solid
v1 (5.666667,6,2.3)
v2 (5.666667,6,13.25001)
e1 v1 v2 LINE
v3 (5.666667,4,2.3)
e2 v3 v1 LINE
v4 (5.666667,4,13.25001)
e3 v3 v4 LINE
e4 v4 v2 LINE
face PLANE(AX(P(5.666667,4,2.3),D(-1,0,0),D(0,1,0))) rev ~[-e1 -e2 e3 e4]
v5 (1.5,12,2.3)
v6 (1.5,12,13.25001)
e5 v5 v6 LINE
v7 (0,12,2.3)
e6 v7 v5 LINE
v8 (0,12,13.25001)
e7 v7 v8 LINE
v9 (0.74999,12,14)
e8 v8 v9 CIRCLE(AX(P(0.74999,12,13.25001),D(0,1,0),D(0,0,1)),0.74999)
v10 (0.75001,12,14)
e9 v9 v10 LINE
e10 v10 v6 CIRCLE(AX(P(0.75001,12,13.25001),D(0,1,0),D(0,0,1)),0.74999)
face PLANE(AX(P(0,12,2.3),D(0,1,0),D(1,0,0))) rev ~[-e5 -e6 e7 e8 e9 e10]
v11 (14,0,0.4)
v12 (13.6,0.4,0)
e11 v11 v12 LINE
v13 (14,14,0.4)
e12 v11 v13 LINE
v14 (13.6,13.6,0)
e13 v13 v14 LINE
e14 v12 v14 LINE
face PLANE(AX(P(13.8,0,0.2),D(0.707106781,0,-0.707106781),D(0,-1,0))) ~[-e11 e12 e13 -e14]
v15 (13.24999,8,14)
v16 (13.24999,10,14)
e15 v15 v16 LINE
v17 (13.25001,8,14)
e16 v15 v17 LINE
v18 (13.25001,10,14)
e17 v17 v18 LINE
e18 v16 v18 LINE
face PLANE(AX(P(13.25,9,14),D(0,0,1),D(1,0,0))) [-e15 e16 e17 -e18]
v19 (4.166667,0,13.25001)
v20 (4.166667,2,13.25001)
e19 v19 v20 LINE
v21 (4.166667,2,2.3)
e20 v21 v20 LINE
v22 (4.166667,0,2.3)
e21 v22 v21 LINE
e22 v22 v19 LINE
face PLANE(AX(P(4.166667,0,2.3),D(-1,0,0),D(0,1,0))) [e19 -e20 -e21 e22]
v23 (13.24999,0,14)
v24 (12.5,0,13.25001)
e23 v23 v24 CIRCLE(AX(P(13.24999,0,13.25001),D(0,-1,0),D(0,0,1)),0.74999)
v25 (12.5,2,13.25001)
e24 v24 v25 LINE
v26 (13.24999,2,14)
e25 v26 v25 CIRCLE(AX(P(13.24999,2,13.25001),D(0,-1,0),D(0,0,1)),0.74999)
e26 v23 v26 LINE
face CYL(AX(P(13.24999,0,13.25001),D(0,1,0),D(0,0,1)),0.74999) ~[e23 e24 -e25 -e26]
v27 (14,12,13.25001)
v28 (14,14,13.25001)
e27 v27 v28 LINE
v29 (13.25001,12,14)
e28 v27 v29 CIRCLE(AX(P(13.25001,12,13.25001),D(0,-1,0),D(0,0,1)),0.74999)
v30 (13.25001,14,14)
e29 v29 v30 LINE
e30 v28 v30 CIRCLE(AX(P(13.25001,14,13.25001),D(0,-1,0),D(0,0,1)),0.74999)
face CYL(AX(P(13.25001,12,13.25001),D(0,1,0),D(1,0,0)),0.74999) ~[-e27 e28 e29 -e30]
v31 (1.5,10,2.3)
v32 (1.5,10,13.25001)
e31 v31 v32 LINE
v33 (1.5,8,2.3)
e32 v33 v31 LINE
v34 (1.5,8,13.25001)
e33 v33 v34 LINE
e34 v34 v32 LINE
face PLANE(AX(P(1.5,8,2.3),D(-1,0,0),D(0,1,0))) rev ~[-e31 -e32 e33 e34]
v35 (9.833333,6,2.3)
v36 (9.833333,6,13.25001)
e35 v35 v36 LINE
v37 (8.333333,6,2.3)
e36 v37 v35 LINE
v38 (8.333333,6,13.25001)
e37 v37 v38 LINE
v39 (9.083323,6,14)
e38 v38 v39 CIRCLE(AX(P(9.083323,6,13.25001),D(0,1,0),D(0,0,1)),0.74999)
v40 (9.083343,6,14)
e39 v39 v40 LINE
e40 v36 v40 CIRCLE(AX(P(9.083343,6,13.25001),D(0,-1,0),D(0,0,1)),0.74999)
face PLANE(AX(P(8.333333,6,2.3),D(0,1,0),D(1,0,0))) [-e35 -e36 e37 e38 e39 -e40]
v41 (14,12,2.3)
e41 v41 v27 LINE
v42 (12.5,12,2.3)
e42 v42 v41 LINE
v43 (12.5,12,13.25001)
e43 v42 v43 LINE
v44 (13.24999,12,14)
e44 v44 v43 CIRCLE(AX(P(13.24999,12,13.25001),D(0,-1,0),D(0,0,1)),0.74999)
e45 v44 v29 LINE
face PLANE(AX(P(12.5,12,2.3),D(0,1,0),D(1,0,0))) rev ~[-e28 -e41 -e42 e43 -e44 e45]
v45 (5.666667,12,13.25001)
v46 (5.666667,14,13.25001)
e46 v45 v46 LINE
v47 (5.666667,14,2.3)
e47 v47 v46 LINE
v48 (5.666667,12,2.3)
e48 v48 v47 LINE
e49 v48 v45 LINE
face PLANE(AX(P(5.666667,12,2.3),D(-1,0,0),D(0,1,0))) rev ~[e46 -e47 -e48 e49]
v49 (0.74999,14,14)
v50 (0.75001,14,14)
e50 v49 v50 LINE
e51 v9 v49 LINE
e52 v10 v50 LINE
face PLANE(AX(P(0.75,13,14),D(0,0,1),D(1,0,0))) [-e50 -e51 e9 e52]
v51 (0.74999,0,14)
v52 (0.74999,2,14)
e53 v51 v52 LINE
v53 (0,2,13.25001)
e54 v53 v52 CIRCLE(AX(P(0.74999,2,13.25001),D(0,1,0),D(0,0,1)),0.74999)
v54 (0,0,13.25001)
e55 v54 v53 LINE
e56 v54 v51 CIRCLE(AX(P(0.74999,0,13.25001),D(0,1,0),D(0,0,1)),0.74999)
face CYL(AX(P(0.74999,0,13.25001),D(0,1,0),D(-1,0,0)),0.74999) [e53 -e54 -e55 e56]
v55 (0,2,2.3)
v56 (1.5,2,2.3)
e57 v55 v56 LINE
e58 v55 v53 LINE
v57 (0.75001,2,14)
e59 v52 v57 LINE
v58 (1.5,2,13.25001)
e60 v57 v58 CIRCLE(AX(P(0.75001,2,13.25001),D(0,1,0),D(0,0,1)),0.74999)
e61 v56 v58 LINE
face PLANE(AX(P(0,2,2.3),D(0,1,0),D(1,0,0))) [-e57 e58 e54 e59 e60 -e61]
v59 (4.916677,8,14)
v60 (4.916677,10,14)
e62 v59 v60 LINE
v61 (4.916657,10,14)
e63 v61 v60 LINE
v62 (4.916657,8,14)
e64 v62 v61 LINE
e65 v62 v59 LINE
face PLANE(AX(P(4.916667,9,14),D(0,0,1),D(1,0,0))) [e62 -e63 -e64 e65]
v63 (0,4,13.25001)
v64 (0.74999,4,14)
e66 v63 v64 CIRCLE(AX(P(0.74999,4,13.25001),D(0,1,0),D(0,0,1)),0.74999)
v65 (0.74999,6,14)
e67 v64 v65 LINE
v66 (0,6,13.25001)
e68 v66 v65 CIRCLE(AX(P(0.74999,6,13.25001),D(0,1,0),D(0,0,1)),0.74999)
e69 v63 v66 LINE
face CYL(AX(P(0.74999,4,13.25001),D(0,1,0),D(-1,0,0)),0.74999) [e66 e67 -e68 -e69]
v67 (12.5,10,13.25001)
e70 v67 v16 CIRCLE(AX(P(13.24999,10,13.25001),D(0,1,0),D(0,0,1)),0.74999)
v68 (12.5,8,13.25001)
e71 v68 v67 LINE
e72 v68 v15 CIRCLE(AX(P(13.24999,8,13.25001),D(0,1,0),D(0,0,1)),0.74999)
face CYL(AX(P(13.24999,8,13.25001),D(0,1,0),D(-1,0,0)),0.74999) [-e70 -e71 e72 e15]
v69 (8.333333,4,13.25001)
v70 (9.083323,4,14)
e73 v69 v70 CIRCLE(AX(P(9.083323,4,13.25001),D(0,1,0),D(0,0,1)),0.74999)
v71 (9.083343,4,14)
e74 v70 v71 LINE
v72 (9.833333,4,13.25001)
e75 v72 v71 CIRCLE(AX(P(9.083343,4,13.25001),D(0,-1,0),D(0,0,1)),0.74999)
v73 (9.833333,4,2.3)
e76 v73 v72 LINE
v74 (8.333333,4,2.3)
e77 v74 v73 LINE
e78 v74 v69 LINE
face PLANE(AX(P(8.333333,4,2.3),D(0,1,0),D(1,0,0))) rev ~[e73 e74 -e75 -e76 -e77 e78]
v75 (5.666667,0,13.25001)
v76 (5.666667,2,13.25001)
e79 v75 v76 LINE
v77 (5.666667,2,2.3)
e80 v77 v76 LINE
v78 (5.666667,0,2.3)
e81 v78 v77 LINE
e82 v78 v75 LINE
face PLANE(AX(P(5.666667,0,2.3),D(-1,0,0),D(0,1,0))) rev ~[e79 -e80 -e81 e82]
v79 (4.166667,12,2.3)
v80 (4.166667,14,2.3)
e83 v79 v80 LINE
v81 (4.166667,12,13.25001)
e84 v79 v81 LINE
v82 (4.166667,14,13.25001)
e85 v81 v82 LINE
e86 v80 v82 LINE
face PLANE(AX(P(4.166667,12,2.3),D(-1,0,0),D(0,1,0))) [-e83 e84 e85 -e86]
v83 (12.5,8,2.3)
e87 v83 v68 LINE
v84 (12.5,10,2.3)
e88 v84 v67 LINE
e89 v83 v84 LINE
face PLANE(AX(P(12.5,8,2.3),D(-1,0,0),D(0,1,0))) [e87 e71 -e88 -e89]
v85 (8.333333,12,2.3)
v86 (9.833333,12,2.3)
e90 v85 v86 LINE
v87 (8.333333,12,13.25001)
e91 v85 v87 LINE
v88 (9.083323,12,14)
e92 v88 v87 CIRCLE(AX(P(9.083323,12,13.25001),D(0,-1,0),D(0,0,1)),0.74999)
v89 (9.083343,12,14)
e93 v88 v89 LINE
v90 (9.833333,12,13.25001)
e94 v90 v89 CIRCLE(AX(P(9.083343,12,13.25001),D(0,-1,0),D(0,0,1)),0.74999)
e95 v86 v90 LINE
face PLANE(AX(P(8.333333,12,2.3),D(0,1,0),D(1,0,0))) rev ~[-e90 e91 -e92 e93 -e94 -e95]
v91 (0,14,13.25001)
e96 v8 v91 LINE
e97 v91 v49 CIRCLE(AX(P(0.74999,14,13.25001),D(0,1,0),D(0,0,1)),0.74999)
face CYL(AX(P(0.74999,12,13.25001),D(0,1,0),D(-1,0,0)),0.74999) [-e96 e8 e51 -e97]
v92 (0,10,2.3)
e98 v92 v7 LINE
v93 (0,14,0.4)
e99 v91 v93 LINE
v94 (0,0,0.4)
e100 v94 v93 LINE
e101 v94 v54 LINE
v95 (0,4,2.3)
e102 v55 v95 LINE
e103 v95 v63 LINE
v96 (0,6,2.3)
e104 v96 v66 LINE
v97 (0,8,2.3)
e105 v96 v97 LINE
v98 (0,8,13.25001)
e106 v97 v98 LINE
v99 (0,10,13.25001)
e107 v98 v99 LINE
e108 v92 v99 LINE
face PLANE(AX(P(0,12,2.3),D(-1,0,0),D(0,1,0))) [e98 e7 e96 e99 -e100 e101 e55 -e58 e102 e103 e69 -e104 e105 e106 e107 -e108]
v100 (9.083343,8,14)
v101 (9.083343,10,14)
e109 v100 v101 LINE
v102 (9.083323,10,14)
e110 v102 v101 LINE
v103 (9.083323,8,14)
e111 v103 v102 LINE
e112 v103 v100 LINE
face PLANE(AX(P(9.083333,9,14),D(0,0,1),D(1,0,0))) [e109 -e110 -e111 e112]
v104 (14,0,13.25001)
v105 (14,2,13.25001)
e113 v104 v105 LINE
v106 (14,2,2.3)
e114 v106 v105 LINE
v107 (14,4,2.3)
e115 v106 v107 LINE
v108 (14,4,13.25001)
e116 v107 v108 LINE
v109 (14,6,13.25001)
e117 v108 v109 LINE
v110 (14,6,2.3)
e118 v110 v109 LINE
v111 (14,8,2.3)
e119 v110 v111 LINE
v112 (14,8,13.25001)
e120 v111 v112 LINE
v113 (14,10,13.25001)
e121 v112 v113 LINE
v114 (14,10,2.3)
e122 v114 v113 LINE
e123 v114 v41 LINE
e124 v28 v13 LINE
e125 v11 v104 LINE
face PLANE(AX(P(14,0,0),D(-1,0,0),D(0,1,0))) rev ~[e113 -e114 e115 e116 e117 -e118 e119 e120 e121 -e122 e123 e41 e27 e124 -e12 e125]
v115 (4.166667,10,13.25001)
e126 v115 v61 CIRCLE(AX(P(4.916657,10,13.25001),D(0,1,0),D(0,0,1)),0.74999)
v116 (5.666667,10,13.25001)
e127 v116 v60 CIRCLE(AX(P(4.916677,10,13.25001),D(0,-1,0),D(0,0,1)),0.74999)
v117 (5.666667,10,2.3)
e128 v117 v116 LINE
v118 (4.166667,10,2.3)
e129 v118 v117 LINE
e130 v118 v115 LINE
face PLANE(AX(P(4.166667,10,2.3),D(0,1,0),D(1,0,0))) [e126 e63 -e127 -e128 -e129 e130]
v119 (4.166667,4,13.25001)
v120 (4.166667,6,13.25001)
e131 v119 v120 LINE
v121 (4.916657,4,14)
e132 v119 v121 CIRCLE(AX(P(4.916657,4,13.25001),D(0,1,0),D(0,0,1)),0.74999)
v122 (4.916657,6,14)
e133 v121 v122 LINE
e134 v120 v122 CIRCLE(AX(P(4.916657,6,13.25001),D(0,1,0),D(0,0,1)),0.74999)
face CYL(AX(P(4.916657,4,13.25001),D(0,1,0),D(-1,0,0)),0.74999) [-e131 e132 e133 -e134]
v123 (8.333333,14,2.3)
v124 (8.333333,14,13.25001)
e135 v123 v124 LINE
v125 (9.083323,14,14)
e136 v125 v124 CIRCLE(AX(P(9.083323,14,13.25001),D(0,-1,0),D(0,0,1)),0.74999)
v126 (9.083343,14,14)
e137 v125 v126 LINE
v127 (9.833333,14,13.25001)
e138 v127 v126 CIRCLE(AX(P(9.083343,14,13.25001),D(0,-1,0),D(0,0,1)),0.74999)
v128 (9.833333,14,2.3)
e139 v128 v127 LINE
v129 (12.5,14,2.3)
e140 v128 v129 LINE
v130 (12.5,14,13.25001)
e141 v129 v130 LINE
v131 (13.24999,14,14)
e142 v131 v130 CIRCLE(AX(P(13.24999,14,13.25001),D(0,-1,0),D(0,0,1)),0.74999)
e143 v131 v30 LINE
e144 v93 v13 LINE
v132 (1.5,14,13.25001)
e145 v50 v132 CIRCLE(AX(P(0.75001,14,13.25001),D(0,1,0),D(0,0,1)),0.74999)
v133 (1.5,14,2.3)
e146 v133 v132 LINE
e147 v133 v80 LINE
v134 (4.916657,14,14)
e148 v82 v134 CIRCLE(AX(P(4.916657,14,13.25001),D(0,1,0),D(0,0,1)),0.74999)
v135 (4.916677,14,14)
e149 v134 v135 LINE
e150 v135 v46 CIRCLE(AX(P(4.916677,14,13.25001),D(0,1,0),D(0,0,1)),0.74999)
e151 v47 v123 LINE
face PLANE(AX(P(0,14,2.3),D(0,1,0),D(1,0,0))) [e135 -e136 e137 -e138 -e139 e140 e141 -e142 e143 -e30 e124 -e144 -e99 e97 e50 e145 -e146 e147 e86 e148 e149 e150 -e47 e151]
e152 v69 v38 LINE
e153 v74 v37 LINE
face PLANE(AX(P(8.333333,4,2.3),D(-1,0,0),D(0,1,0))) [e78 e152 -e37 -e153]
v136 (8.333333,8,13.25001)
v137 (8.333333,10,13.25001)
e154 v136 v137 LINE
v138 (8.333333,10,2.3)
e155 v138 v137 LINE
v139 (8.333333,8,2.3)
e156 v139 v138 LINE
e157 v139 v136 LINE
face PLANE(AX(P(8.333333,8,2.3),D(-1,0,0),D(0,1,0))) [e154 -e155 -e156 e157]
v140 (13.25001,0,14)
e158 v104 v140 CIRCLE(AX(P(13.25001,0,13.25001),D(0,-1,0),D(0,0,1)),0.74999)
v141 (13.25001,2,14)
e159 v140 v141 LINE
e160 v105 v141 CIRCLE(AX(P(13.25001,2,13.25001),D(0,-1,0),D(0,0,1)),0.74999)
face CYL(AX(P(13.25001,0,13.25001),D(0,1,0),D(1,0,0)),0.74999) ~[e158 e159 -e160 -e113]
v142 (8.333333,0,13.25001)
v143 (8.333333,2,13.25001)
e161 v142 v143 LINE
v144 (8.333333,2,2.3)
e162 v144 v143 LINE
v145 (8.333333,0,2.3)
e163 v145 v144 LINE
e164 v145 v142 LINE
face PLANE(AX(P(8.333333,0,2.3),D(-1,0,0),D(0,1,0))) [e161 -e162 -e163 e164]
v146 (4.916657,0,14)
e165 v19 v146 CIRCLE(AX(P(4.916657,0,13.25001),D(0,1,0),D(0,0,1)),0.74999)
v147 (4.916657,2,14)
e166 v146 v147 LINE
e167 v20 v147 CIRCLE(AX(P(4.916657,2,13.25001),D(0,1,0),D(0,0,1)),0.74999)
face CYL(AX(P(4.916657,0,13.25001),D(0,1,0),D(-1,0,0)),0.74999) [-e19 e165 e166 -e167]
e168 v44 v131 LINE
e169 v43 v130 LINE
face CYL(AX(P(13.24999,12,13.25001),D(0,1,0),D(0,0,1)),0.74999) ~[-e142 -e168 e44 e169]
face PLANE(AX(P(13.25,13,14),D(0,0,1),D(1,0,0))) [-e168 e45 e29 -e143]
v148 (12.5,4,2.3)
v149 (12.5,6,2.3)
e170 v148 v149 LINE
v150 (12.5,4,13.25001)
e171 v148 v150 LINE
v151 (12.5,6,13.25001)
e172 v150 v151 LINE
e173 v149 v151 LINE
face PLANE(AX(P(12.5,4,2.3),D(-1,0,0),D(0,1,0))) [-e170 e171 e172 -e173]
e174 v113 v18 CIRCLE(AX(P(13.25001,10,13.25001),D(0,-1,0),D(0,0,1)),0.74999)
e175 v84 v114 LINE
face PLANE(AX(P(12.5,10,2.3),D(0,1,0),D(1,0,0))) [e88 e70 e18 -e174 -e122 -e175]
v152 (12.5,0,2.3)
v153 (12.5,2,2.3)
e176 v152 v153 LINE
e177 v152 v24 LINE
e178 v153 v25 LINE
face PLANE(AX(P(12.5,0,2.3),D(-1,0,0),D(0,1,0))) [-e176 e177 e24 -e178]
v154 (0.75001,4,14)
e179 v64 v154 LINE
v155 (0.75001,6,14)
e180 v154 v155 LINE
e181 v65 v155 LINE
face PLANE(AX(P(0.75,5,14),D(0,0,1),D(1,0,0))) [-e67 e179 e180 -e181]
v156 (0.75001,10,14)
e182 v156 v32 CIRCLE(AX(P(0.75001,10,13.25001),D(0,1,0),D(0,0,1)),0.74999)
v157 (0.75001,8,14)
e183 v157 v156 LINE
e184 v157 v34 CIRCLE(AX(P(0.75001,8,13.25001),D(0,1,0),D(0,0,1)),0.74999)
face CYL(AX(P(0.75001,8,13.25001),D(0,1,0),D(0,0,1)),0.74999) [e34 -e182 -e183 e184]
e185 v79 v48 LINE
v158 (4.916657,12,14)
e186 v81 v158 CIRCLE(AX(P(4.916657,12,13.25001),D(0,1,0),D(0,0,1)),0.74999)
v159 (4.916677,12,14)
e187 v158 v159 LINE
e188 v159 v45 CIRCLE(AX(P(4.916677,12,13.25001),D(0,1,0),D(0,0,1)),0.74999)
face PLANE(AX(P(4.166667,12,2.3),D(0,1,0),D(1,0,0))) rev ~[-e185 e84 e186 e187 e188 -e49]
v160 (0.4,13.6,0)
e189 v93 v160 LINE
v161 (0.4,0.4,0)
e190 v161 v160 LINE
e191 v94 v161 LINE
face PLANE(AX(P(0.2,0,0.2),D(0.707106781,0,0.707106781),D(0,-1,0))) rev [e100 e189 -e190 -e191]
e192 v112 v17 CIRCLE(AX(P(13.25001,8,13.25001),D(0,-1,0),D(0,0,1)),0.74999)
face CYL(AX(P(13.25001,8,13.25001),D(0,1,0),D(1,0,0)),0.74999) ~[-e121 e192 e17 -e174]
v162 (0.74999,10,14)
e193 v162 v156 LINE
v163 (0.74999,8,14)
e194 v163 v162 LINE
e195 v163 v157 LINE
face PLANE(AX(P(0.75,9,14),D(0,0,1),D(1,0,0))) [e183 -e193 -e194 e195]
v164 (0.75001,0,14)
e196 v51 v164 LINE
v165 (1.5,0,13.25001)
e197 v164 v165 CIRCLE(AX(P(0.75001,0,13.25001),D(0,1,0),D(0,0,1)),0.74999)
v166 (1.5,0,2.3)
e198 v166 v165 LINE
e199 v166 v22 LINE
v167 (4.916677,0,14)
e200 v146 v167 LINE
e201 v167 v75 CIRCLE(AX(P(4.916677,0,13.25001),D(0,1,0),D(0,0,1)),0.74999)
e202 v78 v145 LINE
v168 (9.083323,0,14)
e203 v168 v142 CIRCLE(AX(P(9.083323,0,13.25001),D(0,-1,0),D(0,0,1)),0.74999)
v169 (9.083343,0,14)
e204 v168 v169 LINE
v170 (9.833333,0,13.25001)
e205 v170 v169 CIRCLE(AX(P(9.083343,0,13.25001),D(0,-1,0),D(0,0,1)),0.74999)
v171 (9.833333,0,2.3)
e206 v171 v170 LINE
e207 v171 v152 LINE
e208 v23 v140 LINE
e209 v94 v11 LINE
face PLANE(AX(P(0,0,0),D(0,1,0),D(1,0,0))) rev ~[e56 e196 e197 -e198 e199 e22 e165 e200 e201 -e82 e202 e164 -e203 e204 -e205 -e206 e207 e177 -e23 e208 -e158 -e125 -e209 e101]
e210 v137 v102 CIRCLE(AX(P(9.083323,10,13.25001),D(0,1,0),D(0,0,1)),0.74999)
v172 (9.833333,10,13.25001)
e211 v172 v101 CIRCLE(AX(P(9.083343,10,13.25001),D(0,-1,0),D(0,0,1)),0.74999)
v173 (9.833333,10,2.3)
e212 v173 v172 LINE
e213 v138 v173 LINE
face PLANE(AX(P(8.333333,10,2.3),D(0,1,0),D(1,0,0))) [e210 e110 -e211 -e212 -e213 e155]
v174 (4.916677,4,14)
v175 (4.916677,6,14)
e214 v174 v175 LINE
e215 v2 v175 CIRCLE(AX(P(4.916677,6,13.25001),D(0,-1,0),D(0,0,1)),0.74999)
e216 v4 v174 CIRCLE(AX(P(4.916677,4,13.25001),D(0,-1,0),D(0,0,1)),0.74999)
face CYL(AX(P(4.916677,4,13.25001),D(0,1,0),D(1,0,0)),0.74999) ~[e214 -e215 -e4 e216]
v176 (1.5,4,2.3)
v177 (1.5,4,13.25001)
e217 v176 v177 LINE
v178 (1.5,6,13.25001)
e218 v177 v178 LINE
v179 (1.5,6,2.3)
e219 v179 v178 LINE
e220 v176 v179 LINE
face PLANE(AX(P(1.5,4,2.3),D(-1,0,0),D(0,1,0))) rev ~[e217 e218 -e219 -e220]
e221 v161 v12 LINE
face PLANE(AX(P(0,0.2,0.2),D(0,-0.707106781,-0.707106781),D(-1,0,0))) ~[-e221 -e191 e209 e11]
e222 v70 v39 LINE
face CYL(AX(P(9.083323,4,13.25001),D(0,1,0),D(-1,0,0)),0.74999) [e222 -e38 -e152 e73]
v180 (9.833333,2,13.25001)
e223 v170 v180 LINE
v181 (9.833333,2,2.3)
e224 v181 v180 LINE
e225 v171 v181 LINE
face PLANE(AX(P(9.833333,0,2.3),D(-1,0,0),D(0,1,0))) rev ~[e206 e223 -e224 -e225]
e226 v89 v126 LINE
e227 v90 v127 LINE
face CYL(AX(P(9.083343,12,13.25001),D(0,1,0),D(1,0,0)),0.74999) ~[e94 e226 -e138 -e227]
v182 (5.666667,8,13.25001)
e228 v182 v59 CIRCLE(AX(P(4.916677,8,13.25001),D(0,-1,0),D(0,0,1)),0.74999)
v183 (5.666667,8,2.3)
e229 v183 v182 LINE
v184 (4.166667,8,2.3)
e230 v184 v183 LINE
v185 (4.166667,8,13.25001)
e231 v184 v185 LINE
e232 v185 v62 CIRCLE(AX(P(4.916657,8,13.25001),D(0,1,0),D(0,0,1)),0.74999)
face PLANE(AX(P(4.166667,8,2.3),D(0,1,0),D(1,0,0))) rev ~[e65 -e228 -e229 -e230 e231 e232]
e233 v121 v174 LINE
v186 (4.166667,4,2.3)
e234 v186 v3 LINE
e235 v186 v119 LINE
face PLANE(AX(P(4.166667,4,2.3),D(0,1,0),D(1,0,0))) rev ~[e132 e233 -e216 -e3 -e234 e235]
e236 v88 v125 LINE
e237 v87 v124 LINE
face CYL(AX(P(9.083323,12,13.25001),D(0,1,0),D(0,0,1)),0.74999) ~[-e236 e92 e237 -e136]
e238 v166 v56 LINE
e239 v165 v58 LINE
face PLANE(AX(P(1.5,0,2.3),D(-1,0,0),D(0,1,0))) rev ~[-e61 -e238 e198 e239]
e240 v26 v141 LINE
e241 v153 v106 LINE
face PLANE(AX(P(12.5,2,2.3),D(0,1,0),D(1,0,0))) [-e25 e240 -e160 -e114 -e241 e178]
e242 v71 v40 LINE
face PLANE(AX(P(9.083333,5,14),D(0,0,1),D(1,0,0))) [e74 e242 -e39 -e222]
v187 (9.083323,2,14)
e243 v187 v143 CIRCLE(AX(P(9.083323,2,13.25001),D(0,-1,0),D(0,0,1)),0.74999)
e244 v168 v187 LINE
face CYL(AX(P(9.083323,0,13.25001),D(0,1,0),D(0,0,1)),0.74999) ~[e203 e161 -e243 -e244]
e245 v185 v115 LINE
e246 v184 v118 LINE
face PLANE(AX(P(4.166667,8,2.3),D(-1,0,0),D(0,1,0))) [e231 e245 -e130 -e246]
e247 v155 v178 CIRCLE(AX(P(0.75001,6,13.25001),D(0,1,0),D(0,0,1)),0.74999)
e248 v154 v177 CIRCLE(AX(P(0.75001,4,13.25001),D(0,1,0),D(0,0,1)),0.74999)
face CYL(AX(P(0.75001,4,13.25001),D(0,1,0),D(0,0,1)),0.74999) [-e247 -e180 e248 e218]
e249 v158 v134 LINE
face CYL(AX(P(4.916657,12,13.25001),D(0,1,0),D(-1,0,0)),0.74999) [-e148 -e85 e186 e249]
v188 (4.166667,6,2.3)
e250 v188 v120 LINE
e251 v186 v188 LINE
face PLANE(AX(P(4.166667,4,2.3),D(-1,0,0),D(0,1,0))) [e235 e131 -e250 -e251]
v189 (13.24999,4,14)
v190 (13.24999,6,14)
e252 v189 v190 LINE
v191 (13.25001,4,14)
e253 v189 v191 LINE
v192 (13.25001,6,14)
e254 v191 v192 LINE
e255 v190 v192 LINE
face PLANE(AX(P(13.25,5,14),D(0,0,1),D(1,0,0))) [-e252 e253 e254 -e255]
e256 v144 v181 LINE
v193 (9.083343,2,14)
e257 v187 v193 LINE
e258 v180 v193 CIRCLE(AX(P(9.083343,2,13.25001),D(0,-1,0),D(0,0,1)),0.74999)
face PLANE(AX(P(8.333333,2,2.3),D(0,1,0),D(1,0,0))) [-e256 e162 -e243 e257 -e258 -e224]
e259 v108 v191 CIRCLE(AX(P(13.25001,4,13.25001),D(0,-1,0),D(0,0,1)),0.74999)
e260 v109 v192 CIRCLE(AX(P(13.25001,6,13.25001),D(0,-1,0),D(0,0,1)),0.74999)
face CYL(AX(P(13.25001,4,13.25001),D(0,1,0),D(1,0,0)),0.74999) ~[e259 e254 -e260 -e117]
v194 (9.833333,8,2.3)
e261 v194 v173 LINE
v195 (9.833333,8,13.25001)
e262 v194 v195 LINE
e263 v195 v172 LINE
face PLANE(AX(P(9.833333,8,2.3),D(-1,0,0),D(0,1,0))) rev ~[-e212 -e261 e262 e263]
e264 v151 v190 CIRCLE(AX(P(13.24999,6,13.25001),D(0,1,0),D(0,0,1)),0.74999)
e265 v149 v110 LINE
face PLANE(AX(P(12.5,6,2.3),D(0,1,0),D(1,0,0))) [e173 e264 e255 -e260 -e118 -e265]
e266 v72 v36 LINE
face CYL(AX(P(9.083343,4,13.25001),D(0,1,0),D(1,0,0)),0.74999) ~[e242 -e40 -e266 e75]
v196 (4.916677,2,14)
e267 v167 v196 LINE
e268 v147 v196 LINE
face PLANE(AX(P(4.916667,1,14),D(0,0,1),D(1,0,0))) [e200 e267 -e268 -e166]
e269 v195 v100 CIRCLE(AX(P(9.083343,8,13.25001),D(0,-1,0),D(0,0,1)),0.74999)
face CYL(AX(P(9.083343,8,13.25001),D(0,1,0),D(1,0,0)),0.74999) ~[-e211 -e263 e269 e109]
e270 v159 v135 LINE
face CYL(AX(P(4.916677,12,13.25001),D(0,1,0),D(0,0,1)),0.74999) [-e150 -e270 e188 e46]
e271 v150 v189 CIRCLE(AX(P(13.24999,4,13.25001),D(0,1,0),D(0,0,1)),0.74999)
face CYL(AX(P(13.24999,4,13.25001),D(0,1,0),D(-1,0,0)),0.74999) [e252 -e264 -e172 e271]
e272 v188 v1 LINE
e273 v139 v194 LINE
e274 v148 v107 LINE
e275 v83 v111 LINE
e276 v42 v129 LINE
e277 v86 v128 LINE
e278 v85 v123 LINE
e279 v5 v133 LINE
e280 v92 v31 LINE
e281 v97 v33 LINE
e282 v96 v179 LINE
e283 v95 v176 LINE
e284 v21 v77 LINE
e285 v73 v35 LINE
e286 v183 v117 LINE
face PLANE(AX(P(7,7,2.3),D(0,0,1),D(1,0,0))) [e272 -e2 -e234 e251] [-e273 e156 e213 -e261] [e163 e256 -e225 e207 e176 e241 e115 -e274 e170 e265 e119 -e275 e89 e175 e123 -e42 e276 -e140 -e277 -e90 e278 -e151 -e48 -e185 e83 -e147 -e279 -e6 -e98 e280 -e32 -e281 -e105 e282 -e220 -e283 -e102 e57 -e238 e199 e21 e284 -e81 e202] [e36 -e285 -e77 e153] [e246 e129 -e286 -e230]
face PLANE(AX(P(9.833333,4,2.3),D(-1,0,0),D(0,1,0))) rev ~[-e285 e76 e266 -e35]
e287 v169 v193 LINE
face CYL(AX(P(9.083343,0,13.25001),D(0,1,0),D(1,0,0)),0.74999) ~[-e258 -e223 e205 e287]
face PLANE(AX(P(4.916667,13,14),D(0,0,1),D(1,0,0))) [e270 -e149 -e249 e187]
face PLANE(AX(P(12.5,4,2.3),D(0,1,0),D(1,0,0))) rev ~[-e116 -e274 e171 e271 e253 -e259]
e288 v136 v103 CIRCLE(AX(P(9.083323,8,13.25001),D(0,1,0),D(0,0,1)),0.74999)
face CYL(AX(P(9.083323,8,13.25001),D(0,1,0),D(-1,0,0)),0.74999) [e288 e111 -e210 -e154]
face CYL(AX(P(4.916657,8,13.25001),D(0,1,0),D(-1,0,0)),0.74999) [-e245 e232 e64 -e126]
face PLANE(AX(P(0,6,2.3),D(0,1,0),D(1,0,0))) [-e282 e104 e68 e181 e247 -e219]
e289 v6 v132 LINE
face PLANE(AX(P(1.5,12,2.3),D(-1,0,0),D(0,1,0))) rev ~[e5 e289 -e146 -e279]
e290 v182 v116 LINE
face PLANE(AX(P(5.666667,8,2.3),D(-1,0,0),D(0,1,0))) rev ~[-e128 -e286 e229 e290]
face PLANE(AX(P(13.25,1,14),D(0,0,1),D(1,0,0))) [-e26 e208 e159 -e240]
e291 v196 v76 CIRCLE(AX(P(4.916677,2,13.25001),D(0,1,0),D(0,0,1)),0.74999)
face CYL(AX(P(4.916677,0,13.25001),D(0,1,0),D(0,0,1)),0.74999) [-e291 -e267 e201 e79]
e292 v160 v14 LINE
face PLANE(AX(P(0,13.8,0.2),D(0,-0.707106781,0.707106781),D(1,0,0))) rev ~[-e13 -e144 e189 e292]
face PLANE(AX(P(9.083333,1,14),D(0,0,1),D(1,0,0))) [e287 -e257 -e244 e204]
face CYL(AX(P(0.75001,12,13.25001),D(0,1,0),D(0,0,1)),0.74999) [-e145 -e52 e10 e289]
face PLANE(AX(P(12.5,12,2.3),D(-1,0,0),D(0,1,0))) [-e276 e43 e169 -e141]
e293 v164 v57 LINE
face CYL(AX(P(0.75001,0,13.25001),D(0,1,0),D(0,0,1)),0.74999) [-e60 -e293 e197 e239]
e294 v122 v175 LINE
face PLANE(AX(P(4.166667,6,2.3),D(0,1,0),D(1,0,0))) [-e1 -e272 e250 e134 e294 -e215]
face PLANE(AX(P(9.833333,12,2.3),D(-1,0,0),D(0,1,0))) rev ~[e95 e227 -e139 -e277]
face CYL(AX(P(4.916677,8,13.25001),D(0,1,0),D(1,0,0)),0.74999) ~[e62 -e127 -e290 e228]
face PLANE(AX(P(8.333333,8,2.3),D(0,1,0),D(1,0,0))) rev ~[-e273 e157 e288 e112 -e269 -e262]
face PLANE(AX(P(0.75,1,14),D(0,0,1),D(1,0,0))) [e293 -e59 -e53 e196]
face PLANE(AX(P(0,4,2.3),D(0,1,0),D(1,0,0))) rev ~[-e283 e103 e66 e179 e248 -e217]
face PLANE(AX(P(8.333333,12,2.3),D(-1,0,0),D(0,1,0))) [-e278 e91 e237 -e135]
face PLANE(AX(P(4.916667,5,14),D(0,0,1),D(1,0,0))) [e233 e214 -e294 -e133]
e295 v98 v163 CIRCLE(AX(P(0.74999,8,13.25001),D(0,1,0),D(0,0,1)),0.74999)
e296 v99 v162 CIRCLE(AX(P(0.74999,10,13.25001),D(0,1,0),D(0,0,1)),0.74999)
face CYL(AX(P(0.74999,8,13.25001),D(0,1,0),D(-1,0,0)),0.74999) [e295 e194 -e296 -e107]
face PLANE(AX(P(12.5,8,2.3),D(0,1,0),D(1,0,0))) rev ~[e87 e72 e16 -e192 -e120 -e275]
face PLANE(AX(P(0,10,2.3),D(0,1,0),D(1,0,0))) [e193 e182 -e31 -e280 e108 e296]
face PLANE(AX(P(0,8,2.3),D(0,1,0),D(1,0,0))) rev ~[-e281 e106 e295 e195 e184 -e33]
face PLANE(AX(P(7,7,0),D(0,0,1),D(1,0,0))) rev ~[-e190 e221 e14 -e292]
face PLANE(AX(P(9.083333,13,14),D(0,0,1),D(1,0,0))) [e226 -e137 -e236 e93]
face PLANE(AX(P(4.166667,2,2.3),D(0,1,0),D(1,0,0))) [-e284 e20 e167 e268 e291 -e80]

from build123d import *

# Parameters (mm, degrees)
F0_W     = 14
F0_H     = 14
F1_DEPTH = 2.3
F2_W     = 1.5
F2_H     = 2
F3_DEPTH = 11.7
F4_SIZE  = 0.4
F5_R     = 0.74999


# Not quite as in the source:
# - a fillet or chamfer is up to 0.001 mm smaller than in the source, because OpenCascade refuses the exact size


with BuildPart() as f1:
    # F0 (on Top) → F1 (new body)
    with BuildSketch(Plane.XY):
        with Locations((7, 7)):
            Rectangle(F0_W, F0_H)
    extrude(amount=F1_DEPTH)

    # F2 (on face) → F3 (join)
    with BuildSketch(Plane.XY.offset(2.3)):
        with Locations((0.75, 13)):
            Rectangle(F2_W, F2_H)
        with Locations((0.75, 1)):
            Rectangle(F2_W, F2_H)
        with Locations((13.25, 13)):
            Rectangle(F2_W, F2_H)
        with Locations((13.25, 1)):
            Rectangle(F2_W, F2_H)
        with Locations((0.75, 9)):
            Rectangle(F2_W, F2_H)
        with Locations((0.75, 5)):
            Rectangle(F2_W, F2_H)
        with Locations((13.25, 9)):
            Rectangle(F2_W, F2_H)
        with Locations((13.25, 5)):
            Rectangle(F2_W, F2_H)
        with Locations((4.9166666667, 9)):
            Rectangle(F2_W, F2_H)
        with Locations((9.0833333333, 9)):
            Rectangle(F2_W, F2_H)
        with Locations((4.9166666667, 13)):
            Rectangle(F2_W, F2_H)
        with Locations((9.0833333333, 13)):
            Rectangle(F2_W, F2_H)
        with Locations((4.9166666667, 5)):
            Rectangle(F2_W, F2_H)
        with Locations((9.0833333333, 5)):
            Rectangle(F2_W, F2_H)
        with Locations((4.9166666667, 1)):
            Rectangle(F2_W, F2_H)
        with Locations((9.0833333333, 1)):
            Rectangle(F2_W, F2_H)
    extrude(amount=F3_DEPTH)

    # F4
    f4_edges = [f1.edges().sort_by_distance(p)[0] for p in [
        (7, 0, 0),
        (0, 7, 0),
        (14, 7, 0),
        (7, 14, 0),
    ]]
    chamfer(f4_edges, length=F4_SIZE)

    # F5 (radius 0.75 in the source; OpenCascade refuses exactly that, so slightly less here)
    f5_edges = [f1.edges().sort_by_distance(p)[0] for p in [
        (14, 13, 14),
        (12.5, 13, 14),
        (9.833333, 13, 14),
        (8.333333, 13, 14),
        (5.666667, 13, 14),
        (4.166667, 13, 14),
        (1.5, 13, 14),
        (0, 13, 14),
        (0, 9, 14),
        (1.5, 9, 14),
        (4.166667, 9, 14),
        (5.666667, 9, 14),
        (8.333333, 9, 14),
        (9.833333, 9, 14),
        (12.5, 9, 14),
        (14, 9, 14),
        (14, 5, 14),
        (12.5, 5, 14),
        (9.833333, 5, 14),
        (8.333333, 5, 14),
        (5.666667, 5, 14),
        (4.166667, 5, 14),
        (1.5, 5, 14),
        (0, 5, 14),
        (0, 1, 14),
        (1.5, 1, 14),
        (4.166667, 1, 14),
        (5.666667, 1, 14),
        (8.333333, 1, 14),
        (9.833333, 1, 14),
        (12.5, 1, 14),
        (14, 1, 14),
    ]]
    fillet(f5_edges, radius=F5_R)


solid = f1.part
